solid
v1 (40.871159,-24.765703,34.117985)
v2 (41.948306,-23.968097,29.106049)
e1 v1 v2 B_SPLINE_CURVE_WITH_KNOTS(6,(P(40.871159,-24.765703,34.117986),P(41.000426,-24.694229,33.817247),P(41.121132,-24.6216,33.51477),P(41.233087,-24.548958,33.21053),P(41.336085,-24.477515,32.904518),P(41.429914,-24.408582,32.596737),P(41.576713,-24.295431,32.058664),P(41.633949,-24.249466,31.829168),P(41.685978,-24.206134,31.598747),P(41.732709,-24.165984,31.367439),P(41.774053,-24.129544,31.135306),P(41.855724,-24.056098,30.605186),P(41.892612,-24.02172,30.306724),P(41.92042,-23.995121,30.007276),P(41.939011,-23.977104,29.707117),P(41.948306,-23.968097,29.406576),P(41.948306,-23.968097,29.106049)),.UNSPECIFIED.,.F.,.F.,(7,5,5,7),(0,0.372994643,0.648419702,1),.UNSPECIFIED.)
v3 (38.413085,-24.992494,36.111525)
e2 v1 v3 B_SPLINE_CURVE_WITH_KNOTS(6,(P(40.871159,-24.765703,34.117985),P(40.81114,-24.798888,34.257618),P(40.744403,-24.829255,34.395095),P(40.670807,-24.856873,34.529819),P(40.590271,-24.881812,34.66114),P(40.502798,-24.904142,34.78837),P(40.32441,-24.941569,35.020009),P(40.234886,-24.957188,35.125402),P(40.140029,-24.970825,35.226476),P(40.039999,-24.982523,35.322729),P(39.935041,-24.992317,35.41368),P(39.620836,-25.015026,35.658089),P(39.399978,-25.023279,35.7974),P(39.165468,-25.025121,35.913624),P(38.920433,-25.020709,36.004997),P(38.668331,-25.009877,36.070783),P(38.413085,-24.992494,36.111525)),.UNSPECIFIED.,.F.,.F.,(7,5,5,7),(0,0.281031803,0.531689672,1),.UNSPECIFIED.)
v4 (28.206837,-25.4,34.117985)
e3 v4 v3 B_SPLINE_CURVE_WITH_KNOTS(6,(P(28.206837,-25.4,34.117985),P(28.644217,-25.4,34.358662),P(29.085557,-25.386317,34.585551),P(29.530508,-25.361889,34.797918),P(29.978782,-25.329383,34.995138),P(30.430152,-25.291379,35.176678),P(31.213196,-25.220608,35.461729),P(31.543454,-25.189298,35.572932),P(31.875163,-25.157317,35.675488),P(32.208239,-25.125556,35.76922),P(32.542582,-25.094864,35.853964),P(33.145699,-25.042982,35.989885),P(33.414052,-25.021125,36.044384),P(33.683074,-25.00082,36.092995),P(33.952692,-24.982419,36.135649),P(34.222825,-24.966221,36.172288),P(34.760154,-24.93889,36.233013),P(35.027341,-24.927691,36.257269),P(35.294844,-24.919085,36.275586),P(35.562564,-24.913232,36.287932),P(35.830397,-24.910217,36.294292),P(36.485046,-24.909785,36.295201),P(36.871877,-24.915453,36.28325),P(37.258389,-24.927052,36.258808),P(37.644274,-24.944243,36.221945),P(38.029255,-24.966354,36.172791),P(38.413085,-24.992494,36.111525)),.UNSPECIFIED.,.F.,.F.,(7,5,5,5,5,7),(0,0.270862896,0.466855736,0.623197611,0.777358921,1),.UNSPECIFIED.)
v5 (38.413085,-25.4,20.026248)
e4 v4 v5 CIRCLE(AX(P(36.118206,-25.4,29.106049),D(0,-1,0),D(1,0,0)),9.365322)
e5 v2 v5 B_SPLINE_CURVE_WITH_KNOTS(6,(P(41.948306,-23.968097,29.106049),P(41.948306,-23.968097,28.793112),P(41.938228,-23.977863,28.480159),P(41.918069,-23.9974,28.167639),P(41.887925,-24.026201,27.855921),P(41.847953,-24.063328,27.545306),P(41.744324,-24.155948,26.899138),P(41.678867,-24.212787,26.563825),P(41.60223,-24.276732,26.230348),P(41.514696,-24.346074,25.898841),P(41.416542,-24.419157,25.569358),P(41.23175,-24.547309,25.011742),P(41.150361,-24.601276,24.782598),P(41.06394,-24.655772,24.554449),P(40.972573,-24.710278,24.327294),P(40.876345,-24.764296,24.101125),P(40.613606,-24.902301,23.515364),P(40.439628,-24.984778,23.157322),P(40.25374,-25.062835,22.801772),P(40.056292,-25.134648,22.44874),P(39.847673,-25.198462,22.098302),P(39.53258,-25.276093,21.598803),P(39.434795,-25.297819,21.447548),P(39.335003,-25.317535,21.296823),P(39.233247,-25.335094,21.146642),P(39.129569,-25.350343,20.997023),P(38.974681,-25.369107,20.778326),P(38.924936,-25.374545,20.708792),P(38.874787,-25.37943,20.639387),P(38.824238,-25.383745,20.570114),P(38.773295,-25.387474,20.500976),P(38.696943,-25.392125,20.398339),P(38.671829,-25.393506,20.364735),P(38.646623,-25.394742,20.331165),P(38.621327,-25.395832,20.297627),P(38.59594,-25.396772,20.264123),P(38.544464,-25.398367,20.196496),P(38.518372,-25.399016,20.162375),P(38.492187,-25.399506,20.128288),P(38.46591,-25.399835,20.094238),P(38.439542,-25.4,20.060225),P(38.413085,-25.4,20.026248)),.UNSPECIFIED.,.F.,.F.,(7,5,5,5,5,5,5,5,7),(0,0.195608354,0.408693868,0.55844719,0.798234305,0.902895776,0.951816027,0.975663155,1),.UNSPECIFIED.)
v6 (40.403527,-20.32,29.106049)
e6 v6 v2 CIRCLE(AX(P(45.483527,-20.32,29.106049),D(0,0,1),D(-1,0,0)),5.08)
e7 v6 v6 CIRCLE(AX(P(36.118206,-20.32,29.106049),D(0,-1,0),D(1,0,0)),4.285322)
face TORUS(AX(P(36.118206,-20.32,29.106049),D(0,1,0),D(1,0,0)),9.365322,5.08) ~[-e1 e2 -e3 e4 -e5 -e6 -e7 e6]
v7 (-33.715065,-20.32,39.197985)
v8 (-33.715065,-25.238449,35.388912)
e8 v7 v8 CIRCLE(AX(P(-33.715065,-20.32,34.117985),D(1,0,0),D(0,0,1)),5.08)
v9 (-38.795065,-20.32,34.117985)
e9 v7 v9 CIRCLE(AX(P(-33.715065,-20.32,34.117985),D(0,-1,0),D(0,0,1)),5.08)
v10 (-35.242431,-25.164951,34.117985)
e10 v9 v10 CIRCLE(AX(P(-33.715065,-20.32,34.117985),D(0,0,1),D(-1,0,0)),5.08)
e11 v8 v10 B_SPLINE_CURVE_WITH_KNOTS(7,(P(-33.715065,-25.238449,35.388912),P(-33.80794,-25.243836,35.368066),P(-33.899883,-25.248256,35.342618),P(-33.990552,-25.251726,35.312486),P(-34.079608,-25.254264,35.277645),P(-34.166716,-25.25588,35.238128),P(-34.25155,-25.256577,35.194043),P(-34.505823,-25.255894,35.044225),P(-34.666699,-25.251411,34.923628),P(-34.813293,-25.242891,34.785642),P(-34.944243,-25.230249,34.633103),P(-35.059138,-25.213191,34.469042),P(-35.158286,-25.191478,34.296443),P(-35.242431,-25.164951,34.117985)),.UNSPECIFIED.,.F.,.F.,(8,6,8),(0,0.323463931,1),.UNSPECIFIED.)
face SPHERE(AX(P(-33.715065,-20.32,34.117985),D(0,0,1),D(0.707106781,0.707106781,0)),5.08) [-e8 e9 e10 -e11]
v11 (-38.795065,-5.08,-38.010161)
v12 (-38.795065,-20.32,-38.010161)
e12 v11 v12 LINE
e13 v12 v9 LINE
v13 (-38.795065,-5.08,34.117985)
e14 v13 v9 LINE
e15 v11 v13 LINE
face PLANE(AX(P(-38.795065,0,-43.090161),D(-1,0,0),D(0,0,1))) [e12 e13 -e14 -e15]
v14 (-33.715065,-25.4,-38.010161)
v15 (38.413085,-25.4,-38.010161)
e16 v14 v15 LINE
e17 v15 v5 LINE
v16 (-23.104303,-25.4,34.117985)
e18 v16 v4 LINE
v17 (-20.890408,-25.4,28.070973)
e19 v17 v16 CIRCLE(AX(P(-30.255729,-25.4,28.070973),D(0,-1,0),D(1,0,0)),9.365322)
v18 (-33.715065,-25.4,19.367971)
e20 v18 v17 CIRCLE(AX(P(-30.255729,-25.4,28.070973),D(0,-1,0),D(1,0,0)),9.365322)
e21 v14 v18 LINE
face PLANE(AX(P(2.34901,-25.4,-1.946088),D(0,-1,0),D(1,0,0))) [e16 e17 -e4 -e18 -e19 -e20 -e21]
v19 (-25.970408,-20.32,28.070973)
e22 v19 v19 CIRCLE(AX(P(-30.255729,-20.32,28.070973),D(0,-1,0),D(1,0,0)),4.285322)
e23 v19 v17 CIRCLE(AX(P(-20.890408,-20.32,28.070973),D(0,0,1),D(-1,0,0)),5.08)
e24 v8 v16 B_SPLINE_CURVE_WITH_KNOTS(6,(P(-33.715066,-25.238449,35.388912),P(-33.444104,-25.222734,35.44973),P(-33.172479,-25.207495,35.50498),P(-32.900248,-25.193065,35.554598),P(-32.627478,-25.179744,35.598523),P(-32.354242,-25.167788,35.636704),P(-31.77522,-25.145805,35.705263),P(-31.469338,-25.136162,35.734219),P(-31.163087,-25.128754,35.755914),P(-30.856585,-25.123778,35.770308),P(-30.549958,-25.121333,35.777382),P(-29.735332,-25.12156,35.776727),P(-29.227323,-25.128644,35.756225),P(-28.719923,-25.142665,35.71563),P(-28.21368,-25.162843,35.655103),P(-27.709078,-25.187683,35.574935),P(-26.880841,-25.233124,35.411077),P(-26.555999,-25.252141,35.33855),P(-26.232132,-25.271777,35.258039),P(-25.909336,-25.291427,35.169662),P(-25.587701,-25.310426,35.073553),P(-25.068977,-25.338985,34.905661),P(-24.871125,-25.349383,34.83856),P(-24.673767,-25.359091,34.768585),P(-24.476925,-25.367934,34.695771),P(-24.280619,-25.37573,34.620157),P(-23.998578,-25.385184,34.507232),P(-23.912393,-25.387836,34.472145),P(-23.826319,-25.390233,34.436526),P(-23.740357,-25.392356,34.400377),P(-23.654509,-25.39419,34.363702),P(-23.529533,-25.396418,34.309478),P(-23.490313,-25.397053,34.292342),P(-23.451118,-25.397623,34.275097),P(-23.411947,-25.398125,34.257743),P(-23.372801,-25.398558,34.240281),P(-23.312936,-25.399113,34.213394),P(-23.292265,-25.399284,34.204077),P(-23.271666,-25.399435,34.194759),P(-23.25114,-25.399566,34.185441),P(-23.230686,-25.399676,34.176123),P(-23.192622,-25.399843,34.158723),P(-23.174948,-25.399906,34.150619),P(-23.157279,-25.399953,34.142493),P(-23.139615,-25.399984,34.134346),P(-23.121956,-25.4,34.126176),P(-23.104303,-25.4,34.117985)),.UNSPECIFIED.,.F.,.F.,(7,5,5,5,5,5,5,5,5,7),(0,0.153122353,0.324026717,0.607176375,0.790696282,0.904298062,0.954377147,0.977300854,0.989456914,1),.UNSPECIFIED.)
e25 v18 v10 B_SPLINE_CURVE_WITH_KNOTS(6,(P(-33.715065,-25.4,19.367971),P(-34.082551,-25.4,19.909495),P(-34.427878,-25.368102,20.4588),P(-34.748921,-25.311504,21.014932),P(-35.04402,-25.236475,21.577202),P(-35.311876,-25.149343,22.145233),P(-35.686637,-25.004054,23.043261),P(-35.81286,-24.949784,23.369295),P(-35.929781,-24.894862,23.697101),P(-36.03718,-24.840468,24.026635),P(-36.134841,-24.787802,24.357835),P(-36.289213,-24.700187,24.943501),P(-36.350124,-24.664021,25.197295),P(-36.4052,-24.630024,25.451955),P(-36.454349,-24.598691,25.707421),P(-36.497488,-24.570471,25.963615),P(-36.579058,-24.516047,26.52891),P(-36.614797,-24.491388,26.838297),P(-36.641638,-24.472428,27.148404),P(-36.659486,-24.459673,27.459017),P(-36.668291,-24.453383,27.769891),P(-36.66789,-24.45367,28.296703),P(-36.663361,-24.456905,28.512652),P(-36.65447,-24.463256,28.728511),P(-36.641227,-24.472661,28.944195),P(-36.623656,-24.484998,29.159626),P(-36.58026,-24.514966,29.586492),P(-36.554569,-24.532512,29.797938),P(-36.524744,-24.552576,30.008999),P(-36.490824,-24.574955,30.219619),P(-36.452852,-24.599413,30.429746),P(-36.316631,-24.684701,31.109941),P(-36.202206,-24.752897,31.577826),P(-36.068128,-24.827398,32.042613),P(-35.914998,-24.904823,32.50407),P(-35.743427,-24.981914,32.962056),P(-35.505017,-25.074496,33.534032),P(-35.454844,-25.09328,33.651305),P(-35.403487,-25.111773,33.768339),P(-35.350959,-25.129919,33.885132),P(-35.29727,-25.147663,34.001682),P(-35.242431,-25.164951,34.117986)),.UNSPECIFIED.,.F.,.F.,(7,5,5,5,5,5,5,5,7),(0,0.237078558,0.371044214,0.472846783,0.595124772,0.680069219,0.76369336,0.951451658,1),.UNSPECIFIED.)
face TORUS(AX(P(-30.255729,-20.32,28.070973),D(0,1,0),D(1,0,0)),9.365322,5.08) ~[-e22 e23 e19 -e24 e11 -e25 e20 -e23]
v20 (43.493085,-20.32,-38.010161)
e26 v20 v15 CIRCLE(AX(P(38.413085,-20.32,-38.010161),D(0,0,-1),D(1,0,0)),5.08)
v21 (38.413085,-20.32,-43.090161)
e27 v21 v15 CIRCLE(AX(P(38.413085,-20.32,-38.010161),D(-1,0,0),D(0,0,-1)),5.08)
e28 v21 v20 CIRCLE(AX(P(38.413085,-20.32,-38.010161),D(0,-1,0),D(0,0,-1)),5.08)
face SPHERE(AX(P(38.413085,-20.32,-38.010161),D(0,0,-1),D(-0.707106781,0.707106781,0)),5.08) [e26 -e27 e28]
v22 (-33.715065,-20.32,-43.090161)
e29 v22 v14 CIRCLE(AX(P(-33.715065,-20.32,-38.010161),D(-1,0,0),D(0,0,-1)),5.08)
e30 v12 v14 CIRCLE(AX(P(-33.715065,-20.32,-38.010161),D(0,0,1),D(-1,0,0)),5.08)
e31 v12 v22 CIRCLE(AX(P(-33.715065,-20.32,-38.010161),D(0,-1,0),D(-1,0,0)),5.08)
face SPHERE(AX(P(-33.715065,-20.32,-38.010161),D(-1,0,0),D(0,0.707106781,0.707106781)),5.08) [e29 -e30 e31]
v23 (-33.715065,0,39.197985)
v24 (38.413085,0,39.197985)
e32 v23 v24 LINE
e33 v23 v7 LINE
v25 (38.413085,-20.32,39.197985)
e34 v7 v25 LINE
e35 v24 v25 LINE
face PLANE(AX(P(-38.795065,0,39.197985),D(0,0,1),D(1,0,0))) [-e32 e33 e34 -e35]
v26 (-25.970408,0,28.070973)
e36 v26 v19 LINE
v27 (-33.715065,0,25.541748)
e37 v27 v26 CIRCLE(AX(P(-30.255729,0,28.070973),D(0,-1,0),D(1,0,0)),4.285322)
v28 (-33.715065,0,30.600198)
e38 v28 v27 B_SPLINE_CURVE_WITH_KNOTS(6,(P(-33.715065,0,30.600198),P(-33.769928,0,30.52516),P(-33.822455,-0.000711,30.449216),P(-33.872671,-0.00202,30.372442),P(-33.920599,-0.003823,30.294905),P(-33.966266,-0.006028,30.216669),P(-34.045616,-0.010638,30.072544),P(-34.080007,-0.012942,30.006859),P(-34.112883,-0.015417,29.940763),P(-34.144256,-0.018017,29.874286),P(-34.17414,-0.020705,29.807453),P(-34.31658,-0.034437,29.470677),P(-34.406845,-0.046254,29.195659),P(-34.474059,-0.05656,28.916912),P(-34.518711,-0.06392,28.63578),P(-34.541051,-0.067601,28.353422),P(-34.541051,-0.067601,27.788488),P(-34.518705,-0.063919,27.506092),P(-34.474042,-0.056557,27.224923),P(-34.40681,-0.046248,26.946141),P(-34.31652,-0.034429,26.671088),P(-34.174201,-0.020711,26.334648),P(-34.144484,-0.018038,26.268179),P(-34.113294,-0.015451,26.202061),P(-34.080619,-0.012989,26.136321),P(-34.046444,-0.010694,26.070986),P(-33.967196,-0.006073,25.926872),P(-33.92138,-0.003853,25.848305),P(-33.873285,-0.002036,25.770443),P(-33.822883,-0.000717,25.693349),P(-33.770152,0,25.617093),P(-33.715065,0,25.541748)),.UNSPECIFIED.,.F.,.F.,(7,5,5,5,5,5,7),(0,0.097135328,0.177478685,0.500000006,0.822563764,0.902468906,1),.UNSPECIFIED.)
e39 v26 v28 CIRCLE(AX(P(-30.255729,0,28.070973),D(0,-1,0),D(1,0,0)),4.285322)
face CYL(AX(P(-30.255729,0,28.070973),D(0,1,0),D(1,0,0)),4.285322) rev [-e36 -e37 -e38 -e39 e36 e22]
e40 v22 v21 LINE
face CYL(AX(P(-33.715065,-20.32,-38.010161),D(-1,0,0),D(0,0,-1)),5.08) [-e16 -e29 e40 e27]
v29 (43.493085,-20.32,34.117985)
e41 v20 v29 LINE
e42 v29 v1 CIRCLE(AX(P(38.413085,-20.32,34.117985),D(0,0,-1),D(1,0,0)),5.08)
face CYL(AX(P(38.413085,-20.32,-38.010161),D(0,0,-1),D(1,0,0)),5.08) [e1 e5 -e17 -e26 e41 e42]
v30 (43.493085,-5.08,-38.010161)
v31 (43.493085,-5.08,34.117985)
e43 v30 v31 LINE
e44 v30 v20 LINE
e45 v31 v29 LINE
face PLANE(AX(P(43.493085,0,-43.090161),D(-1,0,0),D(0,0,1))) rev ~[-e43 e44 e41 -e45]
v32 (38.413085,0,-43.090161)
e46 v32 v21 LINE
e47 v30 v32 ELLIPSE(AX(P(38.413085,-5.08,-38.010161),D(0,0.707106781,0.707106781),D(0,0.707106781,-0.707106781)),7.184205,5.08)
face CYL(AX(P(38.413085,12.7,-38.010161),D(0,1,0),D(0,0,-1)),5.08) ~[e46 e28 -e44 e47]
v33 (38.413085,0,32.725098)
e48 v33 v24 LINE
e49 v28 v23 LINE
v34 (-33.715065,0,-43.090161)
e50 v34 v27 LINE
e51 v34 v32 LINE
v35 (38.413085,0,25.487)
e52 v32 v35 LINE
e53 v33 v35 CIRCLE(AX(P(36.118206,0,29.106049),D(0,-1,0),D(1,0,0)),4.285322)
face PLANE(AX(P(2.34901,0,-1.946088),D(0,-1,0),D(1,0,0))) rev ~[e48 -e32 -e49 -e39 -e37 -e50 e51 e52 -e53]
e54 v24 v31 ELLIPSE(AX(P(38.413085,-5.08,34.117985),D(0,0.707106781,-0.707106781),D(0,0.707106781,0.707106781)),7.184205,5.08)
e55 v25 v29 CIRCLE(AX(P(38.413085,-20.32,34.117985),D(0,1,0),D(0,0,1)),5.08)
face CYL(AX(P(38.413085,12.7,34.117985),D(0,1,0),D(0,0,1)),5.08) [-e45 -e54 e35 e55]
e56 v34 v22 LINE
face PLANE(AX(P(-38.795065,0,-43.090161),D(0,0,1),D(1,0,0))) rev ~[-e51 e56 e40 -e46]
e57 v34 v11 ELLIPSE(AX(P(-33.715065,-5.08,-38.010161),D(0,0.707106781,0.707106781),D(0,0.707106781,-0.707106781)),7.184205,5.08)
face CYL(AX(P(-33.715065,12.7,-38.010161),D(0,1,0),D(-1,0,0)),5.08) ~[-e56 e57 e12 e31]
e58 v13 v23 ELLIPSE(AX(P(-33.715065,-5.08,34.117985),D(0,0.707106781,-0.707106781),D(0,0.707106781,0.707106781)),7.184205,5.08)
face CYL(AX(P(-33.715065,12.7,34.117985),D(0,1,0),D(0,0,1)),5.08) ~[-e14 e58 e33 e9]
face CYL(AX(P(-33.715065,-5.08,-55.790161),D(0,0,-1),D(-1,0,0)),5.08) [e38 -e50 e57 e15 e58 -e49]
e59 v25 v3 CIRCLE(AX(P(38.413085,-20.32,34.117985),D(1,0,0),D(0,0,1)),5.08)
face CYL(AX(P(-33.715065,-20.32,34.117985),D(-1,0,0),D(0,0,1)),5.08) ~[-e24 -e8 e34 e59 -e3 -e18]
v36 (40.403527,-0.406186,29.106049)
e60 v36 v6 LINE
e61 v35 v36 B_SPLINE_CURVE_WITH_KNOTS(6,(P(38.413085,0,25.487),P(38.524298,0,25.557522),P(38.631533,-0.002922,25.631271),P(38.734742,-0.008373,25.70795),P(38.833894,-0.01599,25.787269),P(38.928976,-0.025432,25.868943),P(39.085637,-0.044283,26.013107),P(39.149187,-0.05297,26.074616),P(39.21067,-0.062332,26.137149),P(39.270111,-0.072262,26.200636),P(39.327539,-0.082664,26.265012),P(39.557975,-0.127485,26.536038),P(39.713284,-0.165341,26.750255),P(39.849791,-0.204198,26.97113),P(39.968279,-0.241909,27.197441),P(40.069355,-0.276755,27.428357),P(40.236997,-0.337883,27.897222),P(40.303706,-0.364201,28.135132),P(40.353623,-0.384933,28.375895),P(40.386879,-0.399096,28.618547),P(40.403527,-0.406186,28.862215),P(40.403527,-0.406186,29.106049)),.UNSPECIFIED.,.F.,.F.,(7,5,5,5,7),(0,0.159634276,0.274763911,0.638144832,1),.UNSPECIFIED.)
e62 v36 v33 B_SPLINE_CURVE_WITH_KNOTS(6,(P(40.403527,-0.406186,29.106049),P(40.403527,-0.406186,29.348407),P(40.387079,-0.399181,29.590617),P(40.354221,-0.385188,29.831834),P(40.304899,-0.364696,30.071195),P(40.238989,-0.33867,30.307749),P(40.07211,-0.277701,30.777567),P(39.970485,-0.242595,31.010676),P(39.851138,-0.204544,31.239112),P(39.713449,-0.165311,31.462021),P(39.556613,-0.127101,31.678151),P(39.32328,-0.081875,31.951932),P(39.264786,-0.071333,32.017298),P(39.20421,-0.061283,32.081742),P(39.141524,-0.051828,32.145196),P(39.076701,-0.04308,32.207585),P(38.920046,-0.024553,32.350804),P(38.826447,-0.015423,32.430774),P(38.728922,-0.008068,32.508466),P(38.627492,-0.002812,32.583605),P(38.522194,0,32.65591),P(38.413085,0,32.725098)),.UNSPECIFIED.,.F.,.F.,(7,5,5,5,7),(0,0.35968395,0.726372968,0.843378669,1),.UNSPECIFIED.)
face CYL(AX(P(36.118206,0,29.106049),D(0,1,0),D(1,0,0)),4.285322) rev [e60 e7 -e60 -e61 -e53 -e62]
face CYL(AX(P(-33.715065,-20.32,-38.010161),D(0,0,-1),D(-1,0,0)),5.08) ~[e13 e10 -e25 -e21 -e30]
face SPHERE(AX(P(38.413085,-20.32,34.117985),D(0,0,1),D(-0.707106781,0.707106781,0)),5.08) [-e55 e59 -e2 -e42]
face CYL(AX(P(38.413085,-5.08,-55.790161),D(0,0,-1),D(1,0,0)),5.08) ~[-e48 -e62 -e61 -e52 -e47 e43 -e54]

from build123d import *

# Parameters (mm, degrees)
F0_W         = 82.2881497443
F0_H         = 82.288146019
F0_R         = 4.2853217598
F1_DEPTH     = 25.4
F2_T1_DEPTH  = 33.02
F2_T3_DEPTH  = 107.688146019
F2_T5_DEPTH  = 72.128146019
F2_T7_DEPTH  = 72.1281497443
F2_S11_W     = 5.08
F2_S11_H     = 5.08
F2_T12_DEPTH = 5.08
F2_S17_W     = 5.08
F2_S17_H     = 5.08
F2_T18_DEPTH = 5.08
F2_S23_W     = 5.08
F2_S23_H     = 5.08
F2_T24_DEPTH = 5.08
F2_S29_W     = 5.08
F2_S29_H     = 5.08
F2_T30_DEPTH = 5.08


# Not quite as in the source:
# - a fillet or chamfer that OpenCascade refuses, or shapes differently, is made with other operations: its cross-section is extruded or revolved along the edge and cut away or added
# - a feature of the source that left no trace in its solid (it failed there, or was rolled back) is left out


with BuildPart() as f1:
    # F0 (on Front) → F1 (new body)
    with BuildSketch(Plane.XZ):
        with Locations((2.3490097374, -1.9460879266)):
            Rectangle(F0_W, F0_H)
        with Locations((-30.2557293326, 28.0709732324)):
            Circle(F0_R, mode=Mode.SUBTRACT)
        with Locations((36.1182056367, 29.1060488671)):
            Circle(F0_R, mode=Mode.SUBTRACT)
    extrude(amount=F1_DEPTH)

    # F2: fillet of radius 5.08 on 12 edges, made by hand

    # F2_s2 → F2_t1 (cut)
    with BuildSketch(Plane.XZ.offset(-12.7)):
        with BuildLine():
            ThreePointArc((38.4130846095, -43.0901609361), (42.0051870579, -41.6022633845), (43.4930846095, -38.0101609361))
            Line((43.4930846095, -38.0101609361), (43.4930846095, -43.0901609361))
            Line((43.4930846095, -43.0901609361), (38.4130846095, -43.0901609361))
        make_face()
        with BuildLine():
            ThreePointArc((38.4130846095, 39.1979850829), (42.0051870579, 37.7100875313), (43.4930846095, 34.1179850829))
            Line((43.4930846095, 34.1179850829), (43.4930846095, 39.1979850829))
            Line((43.4930846095, 39.1979850829), (38.4130846095, 39.1979850829))
        make_face()
        with BuildLine():
            ThreePointArc((-33.7150651348, 39.1979850829), (-37.3071675832, 37.7100875313), (-38.7950651348, 34.1179850829))
            Line((-38.7950651348, 34.1179850829), (-38.7950651348, 39.1979850829))
            Line((-38.7950651348, 39.1979850829), (-33.7150651348, 39.1979850829))
        make_face()
        with BuildLine():
            ThreePointArc((-38.7950651348, -38.0101609361), (-37.3071675832, -41.6022633845), (-33.7150651348, -43.0901609361))
            Line((-33.7150651348, -43.0901609361), (-38.7950651348, -43.0901609361))
            Line((-38.7950651348, -43.0901609361), (-38.7950651348, -38.0101609361))
        make_face()
    extrude(amount=F2_T1_DEPTH, mode=Mode.SUBTRACT)

    # F2_s4 → F2_t3 (cut)
    with BuildSketch(Plane.XY.offset(-55.7901609361)):
        with BuildLine():
            ThreePointArc((43.4930846095, -5.08), (42.0051870579, -1.4878975516), (38.4130846095, 0))
            Line((38.4130846095, 0), (43.4930846095, 0))
            Line((43.4930846095, 0), (43.4930846095, -5.08))
        make_face()
        with BuildLine():
            ThreePointArc((-38.7950651348, -5.08), (-37.3071675832, -1.4878975516), (-33.7150651348, 0))
            Line((-33.7150651348, 0), (-38.7950651348, 0))
            Line((-38.7950651348, 0), (-38.7950651348, -5.08))
        make_face()
    extrude(amount=F2_T3_DEPTH, mode=Mode.SUBTRACT)

    # F2_s6 → F2_t5 (cut)
    with BuildSketch(Plane.XY.offset(-38.0101609361)):
        with BuildLine():
            ThreePointArc((43.4930846095, -20.32), (42.0051870579, -23.9121024484), (38.4130846095, -25.4))
            Line((38.4130846095, -25.4), (43.4930846095, -25.4))
            Line((43.4930846095, -25.4), (43.4930846095, -20.32))
        make_face()
        with BuildLine():
            ThreePointArc((-38.7950651348, -20.32), (-37.3071675832, -23.9121024484), (-33.7150651348, -25.4))
            Line((-33.7150651348, -25.4), (-38.7950651348, -25.4))
            Line((-38.7950651348, -25.4), (-38.7950651348, -20.32))
        make_face()
    extrude(amount=F2_T5_DEPTH, mode=Mode.SUBTRACT)

    # F2_s8 → F2_t7 (cut)
    with BuildSketch(Plane.YZ.offset(-33.7150651348)):
        with BuildLine():
            ThreePointArc((-20.32, 39.1979850829), (-23.9121024484, 37.7100875313), (-25.4, 34.1179850829))
            Line((-25.4, 34.1179850829), (-25.4, 39.1979850829))
            Line((-25.4, 39.1979850829), (-20.32, 39.1979850829))
        make_face()
        with BuildLine():
            ThreePointArc((-20.32, -43.0901609361), (-23.9121024484, -41.6022633845), (-25.4, -38.0101609361))
            Line((-25.4, -38.0101609361), (-25.4, -43.0901609361))
            Line((-25.4, -43.0901609361), (-20.32, -43.0901609361))
        make_face()
    extrude(amount=F2_T7_DEPTH, mode=Mode.SUBTRACT)


with BuildPart() as f2_tool10:
    # F2_s11 → F2_t12 (new body)
    with BuildSketch(Plane.XY.offset(-38.0101609361)):
        with Locations((40.9530846095, -22.86)):
            Rectangle(F2_S11_W, F2_S11_H)
    extrude(amount=-F2_T12_DEPTH)

    # F2_s13 → F2_t14 (revolve, cut)
    with BuildSketch(Plane(origin=(38.4130846095, -20.32, -38.0101609361), x_dir=(-0.7071067812, 0.7071067812, 0), z_dir=(-0.7071067812, -0.7071067812, 0))):
        with BuildLine():
            ThreePointArc((0, -5.08), (5.08, 0), (0, 5.08))
            Line((0, 5.08), (0, -5.08))
        make_face()
    revolve(axis=Axis((38.4130846095, -20.32, -38.0101609361), (0, 0, -1)), mode=Mode.SUBTRACT)


with BuildPart() as f1_1:
    add(f1.part)

    # F2_t9: cut F2_tool10
    add(f2_tool10.part, mode=Mode.SUBTRACT)


with BuildPart() as f2_tool16:
    # F2_s17 → F2_t18 (new body)
    with BuildSketch(Plane.XY.offset(34.1179850829)):
        with Locations((40.9530846095, -22.86)):
            Rectangle(F2_S17_W, F2_S17_H)
    extrude(amount=F2_T18_DEPTH)

    # F2_s19 → F2_t20 (revolve, cut)
    with BuildSketch(Plane(origin=(38.4130846095, -20.32, 34.1179850829), x_dir=(-0.7071067812, 0.7071067812, 0), z_dir=(0.7071067812, 0.7071067812, 0))):
        with BuildLine():
            ThreePointArc((0, -5.08), (5.08, 0), (0, 5.08))
            Line((0, 5.08), (0, -5.08))
        make_face()
    revolve(axis=Axis((38.4130846095, -20.32, 34.1179850829), (0, 0, 1)), mode=Mode.SUBTRACT)


with BuildPart() as f1_2:
    add(f1_1.part)

    # F2_t15: cut F2_tool16
    add(f2_tool16.part, mode=Mode.SUBTRACT)


with BuildPart() as f2_tool22:
    # F2_s23 → F2_t24 (new body)
    with BuildSketch(Plane.XY.offset(34.1179850829)):
        with Locations((-36.2550651348, -22.86)):
            Rectangle(F2_S23_W, F2_S23_H)
    extrude(amount=F2_T24_DEPTH)

    # F2_s25 → F2_t26 (revolve, cut)
    with BuildSketch(Plane(origin=(-33.7150651348, -20.32, 34.1179850829), x_dir=(0.7071067812, 0.7071067812, 0), z_dir=(0.7071067812, -0.7071067812, 0))):
        with BuildLine():
            ThreePointArc((0, -5.08), (5.08, 0), (0, 5.08))
            Line((0, 5.08), (0, -5.08))
        make_face()
    revolve(axis=Axis((-33.7150651348, -20.32, 34.1179850829), (0, 0, 1)), mode=Mode.SUBTRACT)


with BuildPart() as f1_3:
    add(f1_2.part)

    # F2_t21: cut F2_tool22
    add(f2_tool22.part, mode=Mode.SUBTRACT)


with BuildPart() as f2_tool28:
    # F2_s29 → F2_t30 (new body)
    with BuildSketch(Plane.YZ.offset(-33.7150651348)):
        with Locations((-22.86, -40.5501609361)):
            Rectangle(F2_S29_W, F2_S29_H)
    extrude(amount=-F2_T30_DEPTH)

    # F2_s31 → F2_t32 (revolve, cut)
    with BuildSketch(Plane(origin=(-33.7150651348, -20.32, -38.0101609361), x_dir=(0, 0.7071067812, 0.7071067812), z_dir=(0, -0.7071067812, 0.7071067812))):
        with BuildLine():
            ThreePointArc((0, -5.08), (5.08, 0), (0, 5.08))
            Line((0, 5.08), (0, -5.08))
        make_face()
    revolve(axis=Axis((-33.7150651348, -20.32, -38.0101609361), (-1, 0, 0)), mode=Mode.SUBTRACT)


with BuildPart() as f1_4:
    add(f1_3.part)

    # F2_t27: cut F2_tool28
    add(f2_tool28.part, mode=Mode.SUBTRACT)

    # F2_s33 → F2_t34 (revolve, cut)
    with BuildSketch(Plane.XY.offset(28.0709732324)):
        with BuildLine():
            ThreePointArc((-25.9704075728, -20.32), (-24.4825100212, -23.9121024484), (-20.8904075728, -25.4))
            Line((-20.8904075728, -25.4), (-25.9704075728, -25.4))
            Line((-25.9704075728, -25.4), (-25.9704075728, -20.32))
        make_face()
    revolve(axis=Axis((-30.2557293326, -25.4, 28.0709732324), (0, -1, 0)), mode=Mode.SUBTRACT)

    # F2_s35 → F2_t36 (revolve, cut)
    with BuildSketch(Plane.XY.offset(29.1060488671)):
        with BuildLine():
            ThreePointArc((40.4035273965, -20.32), (41.8914249481, -23.9121024484), (45.4835273965, -25.4))
            Line((45.4835273965, -25.4), (40.4035273965, -25.4))
            Line((40.4035273965, -25.4), (40.4035273965, -20.32))
        make_face()
    revolve(axis=Axis((36.1182056367, -25.4, 29.1060488671), (0, -1, 0)), mode=Mode.SUBTRACT)


solid = f1_4.part
